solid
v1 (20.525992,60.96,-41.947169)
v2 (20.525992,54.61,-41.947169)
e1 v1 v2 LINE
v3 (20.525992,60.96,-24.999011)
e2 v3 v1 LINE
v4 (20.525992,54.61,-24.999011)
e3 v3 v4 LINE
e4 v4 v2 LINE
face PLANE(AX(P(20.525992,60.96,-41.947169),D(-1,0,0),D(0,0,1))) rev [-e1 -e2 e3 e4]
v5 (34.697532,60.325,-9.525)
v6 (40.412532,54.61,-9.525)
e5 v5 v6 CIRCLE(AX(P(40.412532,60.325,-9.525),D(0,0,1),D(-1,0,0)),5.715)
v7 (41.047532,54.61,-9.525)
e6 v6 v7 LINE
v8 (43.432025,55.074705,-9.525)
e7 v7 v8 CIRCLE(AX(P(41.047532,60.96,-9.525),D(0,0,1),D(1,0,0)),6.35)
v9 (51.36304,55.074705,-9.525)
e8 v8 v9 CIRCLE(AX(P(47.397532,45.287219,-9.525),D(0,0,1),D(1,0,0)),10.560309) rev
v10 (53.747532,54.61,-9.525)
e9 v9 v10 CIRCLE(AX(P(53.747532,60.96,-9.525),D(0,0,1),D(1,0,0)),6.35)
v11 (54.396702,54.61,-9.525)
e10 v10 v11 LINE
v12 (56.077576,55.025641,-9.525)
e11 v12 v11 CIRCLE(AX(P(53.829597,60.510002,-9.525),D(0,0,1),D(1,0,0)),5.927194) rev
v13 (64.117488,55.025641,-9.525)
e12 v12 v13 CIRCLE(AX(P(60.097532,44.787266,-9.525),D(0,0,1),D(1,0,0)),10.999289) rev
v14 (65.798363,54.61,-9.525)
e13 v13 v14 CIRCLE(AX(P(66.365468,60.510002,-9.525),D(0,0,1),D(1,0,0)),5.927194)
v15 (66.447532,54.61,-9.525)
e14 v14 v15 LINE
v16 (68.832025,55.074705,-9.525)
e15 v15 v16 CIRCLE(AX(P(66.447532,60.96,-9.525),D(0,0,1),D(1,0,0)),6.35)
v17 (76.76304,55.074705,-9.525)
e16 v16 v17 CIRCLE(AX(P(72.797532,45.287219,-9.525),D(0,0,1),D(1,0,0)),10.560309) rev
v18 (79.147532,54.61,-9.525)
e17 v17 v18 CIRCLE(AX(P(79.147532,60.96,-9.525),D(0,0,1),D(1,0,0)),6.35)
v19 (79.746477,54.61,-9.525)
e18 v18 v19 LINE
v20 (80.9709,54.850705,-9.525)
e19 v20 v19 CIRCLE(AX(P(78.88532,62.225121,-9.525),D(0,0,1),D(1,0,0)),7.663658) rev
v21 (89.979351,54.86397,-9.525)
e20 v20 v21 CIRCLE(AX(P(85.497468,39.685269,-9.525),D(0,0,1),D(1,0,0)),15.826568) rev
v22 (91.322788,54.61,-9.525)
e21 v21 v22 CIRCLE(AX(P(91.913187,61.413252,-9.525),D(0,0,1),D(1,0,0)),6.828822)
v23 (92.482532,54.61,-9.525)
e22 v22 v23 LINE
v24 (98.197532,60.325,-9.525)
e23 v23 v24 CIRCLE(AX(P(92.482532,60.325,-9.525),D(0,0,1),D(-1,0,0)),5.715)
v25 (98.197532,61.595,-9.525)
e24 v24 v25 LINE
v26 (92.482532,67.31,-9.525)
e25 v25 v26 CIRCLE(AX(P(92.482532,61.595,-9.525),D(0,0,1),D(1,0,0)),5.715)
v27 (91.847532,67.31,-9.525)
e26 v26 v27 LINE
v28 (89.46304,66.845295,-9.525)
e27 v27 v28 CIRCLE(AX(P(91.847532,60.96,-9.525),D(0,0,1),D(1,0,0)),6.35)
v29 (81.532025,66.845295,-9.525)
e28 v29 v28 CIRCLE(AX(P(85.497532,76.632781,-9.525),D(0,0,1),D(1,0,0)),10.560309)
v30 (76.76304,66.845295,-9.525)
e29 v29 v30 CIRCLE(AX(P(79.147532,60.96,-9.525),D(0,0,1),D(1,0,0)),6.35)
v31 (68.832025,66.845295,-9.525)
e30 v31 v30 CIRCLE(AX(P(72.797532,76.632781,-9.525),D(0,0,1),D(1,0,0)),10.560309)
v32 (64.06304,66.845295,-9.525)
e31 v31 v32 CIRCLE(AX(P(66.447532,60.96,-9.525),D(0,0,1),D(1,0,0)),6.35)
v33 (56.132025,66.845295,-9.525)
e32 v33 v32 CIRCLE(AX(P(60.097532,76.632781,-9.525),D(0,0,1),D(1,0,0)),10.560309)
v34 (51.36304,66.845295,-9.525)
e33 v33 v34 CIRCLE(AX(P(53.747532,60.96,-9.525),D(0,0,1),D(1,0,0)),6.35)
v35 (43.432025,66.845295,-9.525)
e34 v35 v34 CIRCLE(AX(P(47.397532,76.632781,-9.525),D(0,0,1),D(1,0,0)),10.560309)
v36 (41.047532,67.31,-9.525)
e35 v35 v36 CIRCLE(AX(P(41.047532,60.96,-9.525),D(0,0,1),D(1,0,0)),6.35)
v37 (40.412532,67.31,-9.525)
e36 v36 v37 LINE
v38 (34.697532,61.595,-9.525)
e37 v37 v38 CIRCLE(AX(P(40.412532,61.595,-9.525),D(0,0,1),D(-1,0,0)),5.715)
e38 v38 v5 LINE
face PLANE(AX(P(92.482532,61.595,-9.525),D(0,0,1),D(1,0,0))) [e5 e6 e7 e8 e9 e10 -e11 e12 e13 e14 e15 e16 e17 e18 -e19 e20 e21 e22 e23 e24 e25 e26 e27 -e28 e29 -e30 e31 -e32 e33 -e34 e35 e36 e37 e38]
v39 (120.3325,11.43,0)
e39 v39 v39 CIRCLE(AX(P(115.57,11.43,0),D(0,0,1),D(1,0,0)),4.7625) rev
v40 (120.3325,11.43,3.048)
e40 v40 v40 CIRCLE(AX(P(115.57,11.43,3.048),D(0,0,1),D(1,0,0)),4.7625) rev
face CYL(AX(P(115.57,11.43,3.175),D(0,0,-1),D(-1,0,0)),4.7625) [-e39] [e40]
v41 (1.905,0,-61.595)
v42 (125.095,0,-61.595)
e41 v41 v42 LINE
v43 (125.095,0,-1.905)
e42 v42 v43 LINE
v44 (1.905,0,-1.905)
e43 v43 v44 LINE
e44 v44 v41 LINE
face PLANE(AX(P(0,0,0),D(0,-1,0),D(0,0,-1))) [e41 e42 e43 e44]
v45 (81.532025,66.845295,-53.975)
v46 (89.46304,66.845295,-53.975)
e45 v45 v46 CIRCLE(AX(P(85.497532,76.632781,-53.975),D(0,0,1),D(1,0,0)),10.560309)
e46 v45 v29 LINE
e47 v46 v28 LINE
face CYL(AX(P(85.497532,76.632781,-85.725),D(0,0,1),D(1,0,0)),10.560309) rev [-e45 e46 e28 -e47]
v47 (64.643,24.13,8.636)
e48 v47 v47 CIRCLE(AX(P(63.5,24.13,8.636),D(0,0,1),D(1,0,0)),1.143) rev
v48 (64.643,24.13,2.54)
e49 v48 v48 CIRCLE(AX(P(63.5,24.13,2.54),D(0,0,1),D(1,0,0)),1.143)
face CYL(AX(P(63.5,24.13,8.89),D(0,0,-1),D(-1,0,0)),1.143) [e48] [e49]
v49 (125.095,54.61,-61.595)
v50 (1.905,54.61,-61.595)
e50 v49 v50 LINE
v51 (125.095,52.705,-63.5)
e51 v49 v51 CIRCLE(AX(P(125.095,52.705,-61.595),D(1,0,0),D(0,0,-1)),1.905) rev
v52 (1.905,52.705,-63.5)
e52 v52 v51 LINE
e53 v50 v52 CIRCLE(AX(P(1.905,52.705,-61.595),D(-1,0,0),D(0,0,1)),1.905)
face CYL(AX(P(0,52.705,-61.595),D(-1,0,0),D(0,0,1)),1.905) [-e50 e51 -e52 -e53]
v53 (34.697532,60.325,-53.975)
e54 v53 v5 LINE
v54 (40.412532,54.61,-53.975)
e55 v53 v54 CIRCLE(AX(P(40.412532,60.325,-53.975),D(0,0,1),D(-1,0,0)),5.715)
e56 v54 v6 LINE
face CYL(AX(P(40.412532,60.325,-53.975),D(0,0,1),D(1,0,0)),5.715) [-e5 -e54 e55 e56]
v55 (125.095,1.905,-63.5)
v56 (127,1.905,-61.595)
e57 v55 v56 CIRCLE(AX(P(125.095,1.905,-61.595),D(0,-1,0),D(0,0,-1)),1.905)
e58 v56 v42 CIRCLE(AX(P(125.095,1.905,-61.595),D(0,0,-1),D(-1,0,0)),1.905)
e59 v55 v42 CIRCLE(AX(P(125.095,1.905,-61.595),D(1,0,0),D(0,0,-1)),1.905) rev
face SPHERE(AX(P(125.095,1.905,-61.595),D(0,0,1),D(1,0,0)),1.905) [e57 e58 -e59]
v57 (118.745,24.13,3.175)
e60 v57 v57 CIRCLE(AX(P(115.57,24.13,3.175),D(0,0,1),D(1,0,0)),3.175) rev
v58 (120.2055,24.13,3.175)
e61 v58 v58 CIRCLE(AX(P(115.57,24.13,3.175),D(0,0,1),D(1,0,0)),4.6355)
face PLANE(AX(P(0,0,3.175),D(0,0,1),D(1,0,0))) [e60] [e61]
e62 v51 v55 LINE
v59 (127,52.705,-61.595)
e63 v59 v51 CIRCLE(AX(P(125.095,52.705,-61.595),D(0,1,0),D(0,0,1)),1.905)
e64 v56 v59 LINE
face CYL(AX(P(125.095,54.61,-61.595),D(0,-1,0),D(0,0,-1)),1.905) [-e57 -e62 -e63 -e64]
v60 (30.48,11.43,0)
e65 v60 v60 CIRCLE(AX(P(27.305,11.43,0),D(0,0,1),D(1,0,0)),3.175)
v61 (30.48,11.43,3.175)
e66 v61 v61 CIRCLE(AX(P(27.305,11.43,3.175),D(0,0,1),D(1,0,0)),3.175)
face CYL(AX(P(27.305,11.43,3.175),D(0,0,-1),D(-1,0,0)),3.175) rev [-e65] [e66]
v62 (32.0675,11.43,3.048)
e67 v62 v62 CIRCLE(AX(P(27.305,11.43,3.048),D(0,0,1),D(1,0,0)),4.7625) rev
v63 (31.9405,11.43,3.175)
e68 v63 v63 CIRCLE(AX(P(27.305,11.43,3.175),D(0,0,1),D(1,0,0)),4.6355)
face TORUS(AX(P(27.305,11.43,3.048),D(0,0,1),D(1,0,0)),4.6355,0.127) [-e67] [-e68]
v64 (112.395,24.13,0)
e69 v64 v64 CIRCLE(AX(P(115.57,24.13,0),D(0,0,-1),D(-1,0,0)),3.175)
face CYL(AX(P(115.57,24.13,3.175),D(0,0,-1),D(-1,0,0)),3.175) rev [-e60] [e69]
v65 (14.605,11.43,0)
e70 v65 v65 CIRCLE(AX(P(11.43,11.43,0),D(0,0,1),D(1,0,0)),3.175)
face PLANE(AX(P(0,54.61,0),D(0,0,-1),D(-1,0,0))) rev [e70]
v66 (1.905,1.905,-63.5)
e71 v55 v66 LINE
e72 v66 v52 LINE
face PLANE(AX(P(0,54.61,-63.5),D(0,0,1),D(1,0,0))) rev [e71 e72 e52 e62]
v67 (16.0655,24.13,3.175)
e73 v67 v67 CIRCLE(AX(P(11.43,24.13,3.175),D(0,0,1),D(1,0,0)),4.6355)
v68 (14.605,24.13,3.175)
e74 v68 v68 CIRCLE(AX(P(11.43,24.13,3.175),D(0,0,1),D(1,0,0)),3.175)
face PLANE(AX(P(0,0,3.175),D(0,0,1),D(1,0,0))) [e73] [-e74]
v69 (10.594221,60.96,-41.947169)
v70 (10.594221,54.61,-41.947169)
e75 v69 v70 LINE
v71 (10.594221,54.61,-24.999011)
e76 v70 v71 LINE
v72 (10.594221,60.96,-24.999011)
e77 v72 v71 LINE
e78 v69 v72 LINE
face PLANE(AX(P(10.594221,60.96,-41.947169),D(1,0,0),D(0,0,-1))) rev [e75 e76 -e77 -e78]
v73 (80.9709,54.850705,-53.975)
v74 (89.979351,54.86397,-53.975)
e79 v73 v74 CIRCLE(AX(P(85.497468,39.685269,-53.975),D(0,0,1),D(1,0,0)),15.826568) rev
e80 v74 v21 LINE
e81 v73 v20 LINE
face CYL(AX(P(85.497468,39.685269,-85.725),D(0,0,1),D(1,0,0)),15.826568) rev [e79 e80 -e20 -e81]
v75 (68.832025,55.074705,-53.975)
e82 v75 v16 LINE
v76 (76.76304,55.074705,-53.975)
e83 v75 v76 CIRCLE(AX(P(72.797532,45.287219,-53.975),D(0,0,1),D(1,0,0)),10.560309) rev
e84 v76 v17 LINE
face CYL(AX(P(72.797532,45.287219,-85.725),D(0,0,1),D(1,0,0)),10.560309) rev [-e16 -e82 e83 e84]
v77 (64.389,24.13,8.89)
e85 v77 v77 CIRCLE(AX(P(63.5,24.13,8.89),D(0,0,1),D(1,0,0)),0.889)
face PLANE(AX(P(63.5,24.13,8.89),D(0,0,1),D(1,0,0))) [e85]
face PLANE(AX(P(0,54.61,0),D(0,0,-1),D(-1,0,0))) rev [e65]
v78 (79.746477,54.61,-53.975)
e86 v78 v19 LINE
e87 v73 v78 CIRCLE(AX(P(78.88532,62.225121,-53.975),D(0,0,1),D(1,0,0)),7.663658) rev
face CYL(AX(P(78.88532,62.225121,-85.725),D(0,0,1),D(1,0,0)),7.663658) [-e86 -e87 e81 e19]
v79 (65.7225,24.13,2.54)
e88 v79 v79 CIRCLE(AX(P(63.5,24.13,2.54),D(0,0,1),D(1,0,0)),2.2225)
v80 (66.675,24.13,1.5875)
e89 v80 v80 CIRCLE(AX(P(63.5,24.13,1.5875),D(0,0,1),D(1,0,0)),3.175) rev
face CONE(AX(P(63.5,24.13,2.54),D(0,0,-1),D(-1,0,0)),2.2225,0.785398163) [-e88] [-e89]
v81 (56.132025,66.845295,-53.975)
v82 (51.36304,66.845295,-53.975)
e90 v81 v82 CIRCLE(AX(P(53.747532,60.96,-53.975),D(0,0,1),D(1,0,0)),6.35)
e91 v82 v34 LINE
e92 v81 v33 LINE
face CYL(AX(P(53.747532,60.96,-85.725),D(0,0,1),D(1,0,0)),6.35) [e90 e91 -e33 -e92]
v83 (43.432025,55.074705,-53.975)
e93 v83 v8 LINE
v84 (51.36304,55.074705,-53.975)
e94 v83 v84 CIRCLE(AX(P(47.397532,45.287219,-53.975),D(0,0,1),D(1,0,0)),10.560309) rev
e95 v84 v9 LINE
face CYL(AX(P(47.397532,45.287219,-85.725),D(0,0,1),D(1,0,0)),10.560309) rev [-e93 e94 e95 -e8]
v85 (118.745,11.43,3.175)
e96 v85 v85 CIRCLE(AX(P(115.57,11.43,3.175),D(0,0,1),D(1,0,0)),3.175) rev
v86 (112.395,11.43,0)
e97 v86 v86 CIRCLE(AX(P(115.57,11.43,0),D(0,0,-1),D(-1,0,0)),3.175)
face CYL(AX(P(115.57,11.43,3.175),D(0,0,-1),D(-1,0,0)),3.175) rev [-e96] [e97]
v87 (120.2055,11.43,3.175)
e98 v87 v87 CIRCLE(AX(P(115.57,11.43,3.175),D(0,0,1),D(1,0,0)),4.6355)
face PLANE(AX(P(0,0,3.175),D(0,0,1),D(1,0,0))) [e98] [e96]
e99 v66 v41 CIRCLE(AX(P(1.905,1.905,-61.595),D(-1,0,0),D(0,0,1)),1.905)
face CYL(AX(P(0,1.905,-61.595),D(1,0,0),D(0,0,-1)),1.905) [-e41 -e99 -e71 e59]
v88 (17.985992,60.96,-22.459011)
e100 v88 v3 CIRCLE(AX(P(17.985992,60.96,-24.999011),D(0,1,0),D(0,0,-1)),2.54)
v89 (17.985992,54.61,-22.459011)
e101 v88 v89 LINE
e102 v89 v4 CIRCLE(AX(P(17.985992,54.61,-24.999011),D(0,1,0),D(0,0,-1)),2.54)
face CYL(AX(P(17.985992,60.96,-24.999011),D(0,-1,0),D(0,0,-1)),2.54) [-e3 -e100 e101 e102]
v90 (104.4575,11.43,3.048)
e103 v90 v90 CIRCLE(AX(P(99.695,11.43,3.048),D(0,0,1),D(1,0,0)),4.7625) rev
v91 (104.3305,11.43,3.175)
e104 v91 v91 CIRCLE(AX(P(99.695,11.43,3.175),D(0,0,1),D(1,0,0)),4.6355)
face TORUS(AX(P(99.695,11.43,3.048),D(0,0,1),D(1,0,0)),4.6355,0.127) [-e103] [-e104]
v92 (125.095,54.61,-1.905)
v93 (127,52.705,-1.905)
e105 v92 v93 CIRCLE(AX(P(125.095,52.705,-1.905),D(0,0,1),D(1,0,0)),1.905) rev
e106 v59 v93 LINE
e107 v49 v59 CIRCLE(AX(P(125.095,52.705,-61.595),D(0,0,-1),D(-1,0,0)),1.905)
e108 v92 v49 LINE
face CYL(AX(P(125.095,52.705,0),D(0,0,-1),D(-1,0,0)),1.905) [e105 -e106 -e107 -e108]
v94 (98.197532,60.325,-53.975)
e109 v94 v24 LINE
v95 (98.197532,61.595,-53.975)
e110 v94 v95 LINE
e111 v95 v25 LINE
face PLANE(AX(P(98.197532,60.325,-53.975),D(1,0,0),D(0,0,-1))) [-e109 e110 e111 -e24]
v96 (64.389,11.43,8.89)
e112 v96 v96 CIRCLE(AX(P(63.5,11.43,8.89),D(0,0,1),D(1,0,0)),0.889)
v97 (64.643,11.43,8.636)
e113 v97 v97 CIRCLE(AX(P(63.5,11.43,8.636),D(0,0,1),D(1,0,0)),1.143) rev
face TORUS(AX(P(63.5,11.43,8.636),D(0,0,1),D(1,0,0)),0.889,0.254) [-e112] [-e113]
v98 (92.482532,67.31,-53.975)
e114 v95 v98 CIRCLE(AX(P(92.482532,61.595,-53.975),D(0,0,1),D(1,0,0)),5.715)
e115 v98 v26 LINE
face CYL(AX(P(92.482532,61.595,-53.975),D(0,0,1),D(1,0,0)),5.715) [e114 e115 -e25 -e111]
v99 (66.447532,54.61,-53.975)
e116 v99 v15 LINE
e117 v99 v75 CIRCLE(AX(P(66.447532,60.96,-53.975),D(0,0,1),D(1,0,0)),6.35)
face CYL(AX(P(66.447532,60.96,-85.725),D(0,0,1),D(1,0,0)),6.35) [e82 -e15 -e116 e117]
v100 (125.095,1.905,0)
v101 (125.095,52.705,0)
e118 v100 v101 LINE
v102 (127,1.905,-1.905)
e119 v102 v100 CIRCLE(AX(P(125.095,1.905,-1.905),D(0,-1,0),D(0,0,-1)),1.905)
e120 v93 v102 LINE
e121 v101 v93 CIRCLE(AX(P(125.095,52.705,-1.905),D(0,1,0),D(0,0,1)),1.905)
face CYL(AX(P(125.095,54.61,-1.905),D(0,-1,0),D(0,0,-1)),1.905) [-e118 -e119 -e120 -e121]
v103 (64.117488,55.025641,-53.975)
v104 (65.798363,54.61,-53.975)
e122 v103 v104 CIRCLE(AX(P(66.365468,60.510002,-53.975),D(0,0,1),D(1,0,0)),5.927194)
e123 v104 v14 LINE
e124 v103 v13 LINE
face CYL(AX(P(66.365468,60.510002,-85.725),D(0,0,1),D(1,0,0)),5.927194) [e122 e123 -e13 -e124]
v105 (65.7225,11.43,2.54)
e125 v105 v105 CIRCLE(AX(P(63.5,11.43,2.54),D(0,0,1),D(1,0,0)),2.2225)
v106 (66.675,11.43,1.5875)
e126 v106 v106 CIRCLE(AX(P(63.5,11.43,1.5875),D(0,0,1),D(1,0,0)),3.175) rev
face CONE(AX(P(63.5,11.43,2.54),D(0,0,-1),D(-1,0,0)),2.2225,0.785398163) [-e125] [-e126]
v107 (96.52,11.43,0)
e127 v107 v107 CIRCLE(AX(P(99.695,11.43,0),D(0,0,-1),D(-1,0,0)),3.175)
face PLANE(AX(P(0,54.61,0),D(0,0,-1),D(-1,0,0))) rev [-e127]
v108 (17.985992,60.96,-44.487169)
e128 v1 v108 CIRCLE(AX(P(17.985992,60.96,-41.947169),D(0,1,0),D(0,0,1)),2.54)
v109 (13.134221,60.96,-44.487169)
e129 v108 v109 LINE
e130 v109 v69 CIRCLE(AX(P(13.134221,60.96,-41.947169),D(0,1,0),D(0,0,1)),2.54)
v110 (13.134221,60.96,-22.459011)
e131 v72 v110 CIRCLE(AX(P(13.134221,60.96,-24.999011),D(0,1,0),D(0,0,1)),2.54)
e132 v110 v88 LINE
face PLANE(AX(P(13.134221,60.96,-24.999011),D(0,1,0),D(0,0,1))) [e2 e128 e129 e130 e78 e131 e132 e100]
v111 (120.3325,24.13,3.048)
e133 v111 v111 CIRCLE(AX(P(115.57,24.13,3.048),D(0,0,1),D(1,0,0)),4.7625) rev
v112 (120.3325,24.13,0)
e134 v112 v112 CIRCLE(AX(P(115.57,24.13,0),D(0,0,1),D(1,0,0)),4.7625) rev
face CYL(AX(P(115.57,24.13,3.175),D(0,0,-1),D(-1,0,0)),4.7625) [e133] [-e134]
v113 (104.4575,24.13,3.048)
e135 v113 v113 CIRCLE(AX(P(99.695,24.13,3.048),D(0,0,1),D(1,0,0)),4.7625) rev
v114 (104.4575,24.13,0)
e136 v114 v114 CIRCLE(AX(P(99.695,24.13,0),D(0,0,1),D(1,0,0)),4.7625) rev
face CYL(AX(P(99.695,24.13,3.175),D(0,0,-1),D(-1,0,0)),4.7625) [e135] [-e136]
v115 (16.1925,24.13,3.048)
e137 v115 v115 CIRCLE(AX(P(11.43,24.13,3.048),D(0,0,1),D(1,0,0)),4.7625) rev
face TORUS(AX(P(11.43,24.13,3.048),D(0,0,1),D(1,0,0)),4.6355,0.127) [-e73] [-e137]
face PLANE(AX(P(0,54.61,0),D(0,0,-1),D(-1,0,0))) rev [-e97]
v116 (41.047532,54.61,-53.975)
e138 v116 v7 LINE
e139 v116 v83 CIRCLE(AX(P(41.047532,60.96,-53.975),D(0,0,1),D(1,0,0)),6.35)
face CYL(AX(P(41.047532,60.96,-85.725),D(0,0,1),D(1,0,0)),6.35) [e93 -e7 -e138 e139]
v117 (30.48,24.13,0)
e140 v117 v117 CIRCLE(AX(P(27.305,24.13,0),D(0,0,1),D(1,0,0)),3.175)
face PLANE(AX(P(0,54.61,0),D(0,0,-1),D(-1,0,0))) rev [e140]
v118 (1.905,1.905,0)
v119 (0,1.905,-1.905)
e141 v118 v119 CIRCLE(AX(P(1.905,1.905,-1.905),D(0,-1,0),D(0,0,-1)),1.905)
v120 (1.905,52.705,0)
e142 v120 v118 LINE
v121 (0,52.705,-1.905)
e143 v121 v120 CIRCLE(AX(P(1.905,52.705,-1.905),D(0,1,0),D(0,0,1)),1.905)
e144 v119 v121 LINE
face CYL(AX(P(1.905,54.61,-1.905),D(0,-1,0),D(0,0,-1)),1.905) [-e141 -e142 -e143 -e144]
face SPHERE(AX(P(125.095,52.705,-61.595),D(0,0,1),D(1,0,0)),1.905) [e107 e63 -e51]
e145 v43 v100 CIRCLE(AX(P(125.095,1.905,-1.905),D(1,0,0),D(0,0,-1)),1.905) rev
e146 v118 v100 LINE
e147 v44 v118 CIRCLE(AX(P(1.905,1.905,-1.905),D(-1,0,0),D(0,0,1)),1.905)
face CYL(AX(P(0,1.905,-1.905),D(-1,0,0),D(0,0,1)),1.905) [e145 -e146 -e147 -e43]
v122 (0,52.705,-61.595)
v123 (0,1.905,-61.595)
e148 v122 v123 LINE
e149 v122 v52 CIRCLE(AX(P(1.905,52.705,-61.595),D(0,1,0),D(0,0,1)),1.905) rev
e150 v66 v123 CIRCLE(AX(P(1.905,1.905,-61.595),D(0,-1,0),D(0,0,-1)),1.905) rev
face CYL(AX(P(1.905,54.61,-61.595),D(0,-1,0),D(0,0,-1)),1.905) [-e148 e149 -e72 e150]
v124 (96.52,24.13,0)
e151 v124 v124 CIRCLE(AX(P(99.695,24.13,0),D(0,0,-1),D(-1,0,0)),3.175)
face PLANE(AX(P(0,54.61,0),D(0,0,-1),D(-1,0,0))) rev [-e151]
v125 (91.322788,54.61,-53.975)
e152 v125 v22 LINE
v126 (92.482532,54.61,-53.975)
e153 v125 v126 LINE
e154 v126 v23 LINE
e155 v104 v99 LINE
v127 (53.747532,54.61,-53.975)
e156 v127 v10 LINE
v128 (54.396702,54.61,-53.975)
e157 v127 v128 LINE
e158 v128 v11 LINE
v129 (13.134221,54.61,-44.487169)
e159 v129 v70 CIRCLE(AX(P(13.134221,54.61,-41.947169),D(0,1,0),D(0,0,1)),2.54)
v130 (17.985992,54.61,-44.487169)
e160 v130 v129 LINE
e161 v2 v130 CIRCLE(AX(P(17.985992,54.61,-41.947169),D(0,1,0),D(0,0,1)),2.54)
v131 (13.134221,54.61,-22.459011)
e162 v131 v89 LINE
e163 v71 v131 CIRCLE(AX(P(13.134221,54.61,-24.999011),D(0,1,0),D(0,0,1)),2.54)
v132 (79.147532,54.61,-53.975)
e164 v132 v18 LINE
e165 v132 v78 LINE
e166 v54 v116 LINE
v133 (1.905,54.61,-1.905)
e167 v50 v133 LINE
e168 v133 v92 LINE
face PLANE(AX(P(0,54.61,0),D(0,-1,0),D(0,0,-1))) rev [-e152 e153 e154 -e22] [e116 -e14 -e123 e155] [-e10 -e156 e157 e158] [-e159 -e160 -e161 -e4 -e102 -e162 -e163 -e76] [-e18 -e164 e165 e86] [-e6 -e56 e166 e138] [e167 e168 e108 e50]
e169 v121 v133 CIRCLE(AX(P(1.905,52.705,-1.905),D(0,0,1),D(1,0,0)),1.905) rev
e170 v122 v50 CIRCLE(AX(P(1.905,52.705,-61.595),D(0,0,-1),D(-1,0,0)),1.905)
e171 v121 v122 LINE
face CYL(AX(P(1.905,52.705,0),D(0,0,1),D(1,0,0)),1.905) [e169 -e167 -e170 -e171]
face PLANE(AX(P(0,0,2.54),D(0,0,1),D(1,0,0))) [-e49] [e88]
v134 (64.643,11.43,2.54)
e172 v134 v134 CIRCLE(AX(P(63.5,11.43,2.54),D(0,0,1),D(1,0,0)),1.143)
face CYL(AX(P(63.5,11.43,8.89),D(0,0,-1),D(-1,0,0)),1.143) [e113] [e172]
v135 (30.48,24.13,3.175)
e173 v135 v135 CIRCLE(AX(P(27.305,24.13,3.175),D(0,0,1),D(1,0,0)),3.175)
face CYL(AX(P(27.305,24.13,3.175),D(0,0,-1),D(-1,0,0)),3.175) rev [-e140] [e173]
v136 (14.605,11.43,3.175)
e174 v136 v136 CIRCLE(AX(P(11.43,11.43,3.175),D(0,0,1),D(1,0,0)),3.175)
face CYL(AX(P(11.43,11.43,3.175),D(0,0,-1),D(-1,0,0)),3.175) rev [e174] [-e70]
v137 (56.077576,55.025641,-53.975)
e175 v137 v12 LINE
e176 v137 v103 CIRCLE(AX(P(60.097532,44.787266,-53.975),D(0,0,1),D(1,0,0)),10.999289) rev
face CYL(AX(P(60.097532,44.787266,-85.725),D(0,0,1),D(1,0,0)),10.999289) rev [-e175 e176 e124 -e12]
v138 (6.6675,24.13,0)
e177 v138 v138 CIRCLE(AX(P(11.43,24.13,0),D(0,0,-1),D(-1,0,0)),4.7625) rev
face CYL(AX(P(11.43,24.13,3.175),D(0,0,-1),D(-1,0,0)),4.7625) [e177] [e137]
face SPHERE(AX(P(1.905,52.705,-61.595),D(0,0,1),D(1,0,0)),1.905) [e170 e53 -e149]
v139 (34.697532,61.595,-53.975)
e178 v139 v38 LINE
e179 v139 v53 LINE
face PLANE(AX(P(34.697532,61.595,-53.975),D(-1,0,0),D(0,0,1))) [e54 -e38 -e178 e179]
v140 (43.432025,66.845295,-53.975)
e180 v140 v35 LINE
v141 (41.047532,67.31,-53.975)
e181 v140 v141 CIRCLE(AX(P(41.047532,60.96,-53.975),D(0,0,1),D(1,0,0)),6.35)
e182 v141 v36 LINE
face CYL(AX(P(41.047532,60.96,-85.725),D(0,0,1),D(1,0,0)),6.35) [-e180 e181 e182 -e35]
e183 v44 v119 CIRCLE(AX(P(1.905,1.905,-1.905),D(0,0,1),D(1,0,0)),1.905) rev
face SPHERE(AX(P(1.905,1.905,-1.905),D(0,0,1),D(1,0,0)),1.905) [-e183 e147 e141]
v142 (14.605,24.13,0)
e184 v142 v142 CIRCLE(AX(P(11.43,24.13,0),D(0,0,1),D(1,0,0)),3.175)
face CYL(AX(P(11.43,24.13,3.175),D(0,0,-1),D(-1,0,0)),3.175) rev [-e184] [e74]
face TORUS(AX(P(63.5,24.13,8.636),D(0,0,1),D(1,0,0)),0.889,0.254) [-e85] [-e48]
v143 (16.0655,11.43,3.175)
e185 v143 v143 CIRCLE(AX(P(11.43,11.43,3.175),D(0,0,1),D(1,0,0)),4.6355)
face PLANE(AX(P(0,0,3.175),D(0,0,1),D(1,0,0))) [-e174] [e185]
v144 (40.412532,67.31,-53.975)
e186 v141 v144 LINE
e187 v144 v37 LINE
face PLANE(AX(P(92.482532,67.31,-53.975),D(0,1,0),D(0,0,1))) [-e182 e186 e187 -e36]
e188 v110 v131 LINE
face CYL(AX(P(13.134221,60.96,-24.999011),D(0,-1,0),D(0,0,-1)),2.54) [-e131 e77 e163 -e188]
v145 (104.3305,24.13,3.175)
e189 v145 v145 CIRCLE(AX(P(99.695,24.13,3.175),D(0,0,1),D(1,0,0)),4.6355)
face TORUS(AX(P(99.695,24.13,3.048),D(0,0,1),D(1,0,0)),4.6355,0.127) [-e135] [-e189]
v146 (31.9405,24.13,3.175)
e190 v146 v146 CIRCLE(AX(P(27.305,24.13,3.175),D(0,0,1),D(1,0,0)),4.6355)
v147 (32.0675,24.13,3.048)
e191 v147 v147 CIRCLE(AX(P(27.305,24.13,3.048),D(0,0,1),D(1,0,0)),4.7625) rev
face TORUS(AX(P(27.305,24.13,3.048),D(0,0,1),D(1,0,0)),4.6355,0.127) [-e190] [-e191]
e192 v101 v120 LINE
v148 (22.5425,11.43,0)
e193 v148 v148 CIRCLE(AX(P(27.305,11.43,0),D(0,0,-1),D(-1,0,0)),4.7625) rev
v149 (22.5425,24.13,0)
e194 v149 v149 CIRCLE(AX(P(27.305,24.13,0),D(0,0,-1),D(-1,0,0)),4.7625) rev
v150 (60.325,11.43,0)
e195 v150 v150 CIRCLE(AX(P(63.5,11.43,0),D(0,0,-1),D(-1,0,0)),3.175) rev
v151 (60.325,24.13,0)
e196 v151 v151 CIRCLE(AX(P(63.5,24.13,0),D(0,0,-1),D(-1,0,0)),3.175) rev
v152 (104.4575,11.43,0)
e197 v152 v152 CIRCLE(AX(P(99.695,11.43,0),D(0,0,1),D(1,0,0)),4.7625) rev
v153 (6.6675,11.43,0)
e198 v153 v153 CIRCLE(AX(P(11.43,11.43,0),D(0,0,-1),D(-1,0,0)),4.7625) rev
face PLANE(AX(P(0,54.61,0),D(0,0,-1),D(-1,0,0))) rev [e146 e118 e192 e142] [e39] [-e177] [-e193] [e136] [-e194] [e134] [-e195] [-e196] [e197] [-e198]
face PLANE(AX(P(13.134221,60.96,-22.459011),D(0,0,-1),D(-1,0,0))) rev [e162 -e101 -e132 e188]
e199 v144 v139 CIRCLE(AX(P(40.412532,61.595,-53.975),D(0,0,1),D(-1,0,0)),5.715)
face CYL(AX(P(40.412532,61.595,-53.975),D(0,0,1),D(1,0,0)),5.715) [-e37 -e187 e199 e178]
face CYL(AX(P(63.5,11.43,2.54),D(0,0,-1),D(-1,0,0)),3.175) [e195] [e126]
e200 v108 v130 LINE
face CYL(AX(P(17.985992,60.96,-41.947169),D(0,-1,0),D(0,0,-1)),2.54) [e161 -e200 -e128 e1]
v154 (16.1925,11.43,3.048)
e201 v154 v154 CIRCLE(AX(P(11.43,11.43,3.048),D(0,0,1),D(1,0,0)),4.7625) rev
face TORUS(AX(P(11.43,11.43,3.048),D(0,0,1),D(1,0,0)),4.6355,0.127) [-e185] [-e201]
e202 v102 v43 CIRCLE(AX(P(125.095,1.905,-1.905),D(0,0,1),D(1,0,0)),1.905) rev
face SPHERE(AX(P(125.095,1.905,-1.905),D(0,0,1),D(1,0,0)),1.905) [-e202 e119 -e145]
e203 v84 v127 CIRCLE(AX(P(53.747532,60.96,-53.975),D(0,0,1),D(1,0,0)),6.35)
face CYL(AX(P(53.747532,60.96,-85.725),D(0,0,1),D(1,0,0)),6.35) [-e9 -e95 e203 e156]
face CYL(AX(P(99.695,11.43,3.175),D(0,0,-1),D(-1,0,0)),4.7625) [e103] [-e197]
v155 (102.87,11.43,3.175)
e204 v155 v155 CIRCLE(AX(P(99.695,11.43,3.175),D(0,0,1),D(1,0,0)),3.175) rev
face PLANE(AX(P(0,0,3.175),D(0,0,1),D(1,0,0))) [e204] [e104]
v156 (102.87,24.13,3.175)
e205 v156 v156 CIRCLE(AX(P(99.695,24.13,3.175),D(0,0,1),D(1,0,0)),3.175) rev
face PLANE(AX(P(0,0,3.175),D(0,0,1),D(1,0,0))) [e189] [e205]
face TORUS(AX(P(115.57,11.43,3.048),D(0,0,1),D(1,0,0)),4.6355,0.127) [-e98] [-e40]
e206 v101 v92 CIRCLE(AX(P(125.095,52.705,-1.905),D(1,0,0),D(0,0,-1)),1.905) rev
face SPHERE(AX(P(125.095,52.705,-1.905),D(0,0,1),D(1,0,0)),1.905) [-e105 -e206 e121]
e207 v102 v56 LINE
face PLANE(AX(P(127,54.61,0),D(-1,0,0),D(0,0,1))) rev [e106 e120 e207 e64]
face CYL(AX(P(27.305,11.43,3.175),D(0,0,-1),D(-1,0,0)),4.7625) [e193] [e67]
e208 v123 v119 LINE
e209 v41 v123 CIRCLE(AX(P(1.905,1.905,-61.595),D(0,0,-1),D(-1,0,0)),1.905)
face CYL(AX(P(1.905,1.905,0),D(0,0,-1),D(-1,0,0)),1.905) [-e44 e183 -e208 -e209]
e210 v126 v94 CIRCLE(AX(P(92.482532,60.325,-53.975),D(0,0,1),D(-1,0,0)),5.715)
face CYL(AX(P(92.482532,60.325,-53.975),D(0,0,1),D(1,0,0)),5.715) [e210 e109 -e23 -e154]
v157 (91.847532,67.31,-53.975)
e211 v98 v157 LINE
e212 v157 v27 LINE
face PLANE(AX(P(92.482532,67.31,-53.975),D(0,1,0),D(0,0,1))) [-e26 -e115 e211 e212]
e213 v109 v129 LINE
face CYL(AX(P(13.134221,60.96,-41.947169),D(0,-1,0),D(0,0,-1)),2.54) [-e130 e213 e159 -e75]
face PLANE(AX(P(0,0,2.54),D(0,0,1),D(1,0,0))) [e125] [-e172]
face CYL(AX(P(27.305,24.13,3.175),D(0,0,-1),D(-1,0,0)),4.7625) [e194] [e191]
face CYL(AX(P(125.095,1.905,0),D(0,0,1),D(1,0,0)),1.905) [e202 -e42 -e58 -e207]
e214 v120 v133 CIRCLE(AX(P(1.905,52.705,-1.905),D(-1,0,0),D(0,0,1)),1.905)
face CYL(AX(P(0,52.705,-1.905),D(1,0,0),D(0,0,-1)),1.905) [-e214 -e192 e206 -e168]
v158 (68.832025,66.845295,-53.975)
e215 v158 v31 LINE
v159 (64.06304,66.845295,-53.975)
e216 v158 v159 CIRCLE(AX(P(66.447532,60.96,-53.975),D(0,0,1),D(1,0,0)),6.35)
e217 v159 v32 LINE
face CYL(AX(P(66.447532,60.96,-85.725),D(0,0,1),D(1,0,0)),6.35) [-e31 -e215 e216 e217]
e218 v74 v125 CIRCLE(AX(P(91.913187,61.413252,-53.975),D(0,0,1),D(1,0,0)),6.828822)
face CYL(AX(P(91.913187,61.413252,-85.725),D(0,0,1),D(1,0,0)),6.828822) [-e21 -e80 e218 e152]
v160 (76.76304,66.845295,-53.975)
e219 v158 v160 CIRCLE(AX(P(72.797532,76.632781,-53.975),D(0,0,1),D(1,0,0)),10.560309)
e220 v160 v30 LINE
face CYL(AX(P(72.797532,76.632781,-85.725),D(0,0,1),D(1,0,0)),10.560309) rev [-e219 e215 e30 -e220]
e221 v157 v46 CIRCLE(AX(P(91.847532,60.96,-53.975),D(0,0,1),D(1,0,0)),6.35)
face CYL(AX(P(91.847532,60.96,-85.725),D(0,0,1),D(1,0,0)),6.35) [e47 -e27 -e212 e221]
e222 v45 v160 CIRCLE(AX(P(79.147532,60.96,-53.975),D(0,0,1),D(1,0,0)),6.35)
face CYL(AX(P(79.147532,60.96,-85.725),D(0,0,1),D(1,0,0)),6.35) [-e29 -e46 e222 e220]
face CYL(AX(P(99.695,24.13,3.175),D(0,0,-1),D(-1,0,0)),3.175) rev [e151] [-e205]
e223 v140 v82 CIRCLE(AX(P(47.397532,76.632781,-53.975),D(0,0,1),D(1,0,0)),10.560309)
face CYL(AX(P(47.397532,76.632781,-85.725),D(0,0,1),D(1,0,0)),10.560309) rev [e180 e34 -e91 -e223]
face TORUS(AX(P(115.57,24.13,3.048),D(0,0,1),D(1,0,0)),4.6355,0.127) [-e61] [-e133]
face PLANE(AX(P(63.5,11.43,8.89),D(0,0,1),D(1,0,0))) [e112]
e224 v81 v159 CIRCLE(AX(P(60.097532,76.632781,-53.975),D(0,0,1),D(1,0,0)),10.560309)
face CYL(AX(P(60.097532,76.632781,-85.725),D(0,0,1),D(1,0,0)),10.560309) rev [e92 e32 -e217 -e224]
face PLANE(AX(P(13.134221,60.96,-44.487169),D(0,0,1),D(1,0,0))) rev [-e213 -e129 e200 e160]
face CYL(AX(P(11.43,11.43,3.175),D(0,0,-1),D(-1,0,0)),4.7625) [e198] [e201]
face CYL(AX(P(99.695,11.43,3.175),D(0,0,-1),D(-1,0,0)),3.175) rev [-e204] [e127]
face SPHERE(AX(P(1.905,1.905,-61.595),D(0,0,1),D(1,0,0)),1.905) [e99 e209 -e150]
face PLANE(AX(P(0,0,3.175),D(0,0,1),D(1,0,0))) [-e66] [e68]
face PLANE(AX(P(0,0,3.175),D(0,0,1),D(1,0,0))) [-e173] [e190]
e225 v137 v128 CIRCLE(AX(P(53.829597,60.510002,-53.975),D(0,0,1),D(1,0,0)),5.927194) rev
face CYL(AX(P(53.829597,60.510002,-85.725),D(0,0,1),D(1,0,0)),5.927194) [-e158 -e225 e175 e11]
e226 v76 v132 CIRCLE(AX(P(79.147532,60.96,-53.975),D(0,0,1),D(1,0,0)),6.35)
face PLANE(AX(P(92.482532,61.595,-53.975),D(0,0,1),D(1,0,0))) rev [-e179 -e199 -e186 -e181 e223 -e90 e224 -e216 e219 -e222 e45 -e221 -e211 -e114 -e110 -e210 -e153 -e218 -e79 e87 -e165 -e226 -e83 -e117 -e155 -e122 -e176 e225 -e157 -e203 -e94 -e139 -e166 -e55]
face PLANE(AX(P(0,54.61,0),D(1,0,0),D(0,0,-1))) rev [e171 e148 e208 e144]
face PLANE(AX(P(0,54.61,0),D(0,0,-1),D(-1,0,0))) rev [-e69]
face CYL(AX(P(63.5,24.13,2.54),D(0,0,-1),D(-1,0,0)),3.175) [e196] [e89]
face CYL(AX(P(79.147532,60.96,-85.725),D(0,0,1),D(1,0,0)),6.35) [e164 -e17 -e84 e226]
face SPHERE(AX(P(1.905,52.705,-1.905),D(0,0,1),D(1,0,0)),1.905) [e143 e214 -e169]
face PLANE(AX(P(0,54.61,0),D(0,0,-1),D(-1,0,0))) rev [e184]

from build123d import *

# Parameters (mm, degrees)
SKETCH2_W           = 127
SKETCH2_H           = 63.5
BOSS_EXTRUDE1_DEPTH = 54.61
FILLET1_R           = 1.905
SKETCH3_R           = 4.7625
SKETCH3_R_2         = 3.175
BOSS_EXTRUDE2_DEPTH = 3.175
FILLET2_R           = 0.127
BOSS_EXTRUDE3_DEPTH = 53.975
CUT_EXTRUDE1_DEPTH  = 9.525
BOSS_EXTRUDE4_DEPTH = 6.35
BOSS_EXTRUDE5_DEPTH = 2.54
SKETCH8_R           = 1.143
BOSS_EXTRUDE6_DEPTH = 6.35
FILLET3_R           = 0.254
CUT_EXTRUDE10_DEPTH = 76.2
CUT_EXTRUDE12_DEPTH = 76.2
CUT_EXTRUDE14_DEPTH = 76.2
CUT_EXTRUDE18_DEPTH = 76.2
CUT_EXTRUDE19_DEPTH = 76.2


with BuildPart() as part:
    # Sketch2 → Boss-Extrude1 (new body)
    with BuildSketch(Plane(origin=(0, 0, 0), x_dir=(1, 0, 0), z_dir=(0, 1, 0))):
        with Locations((63.5, 31.75)):
            Rectangle(SKETCH2_W, SKETCH2_H)
    extrude(amount=BOSS_EXTRUDE1_DEPTH)

    # Fillet1
    fillet1_edges = [part.edges().sort_by_distance(p)[0] for p in [
        (127, 54.61, -31.75),
        (63.5, 54.61, -63.5),
        (0, 54.61, -31.75),
        (63.5, 0, -63.5),
        (127, 0, -31.75),
        (63.5, 0, 0),
        (0, 0, -31.75),
        (63.5, 54.61, 0),
        (0, 27.305, -63.5),
        (127, 27.305, -63.5),
        (127, 27.305, 0),
        (0, 27.305, 0),
    ]]
    fillet(fillet1_edges, radius=FILLET1_R)

    # Sketch3 → Boss-Extrude2 (add)
    # profile 1 of 8: a face of its own
    with BuildSketch(Plane.XY):
        with Locations(Location((11.43, 24.13, 0), (0, 0, 180))):
            Circle(SKETCH3_R)
        with Locations((11.43, 24.13)):
            Circle(SKETCH3_R_2, mode=Mode.SUBTRACT)
    # profile 2 of 8: a face of its own
    with BuildSketch(Plane.XY):
        with Locations(Location((27.305, 24.13, 0), (0, 0, 180))):
            Circle(SKETCH3_R)
        with Locations((27.305, 24.13)):
            Circle(SKETCH3_R_2, mode=Mode.SUBTRACT)
    # profile 3 of 8: a face of its own
    with BuildSketch(Plane.XY):
        with Locations(Location((27.305, 11.43, 0), (0, 0, 180))):
            Circle(SKETCH3_R)
        with Locations((27.305, 11.43)):
            Circle(SKETCH3_R_2, mode=Mode.SUBTRACT)
    # profile 4 of 8: a face of its own
    with BuildSketch(Plane.XY):
        with Locations(Location((11.43, 11.43, 0), (0, 0, 180))):
            Circle(SKETCH3_R)
        with Locations((11.43, 11.43)):
            Circle(SKETCH3_R_2, mode=Mode.SUBTRACT)
    # profile 5 of 8: a face of its own
    with BuildSketch(Plane.XY):
        with Locations((99.695, 11.43)):
            Circle(SKETCH3_R)
        with Locations(Location((99.695, 11.43, 0), (0, 0, 180))):
            Circle(SKETCH3_R_2, mode=Mode.SUBTRACT)
    # profile 6 of 8: a face of its own
    with BuildSketch(Plane.XY):
        with Locations((99.695, 24.13)):
            Circle(SKETCH3_R)
        with Locations(Location((99.695, 24.13, 0), (0, 0, 180))):
            Circle(SKETCH3_R_2, mode=Mode.SUBTRACT)
    # profile 7 of 8: a face of its own
    with BuildSketch(Plane.XY):
        with Locations((115.57, 24.13)):
            Circle(SKETCH3_R)
        with Locations(Location((115.57, 24.13, 0), (0, 0, 180))):
            Circle(SKETCH3_R_2, mode=Mode.SUBTRACT)
    # profile 8 of 8: a face of its own
    with BuildSketch(Plane.XY):
        with Locations((115.57, 11.43)):
            Circle(SKETCH3_R)
        with Locations(Location((115.57, 11.43, 0), (0, 0, 180))):
            Circle(SKETCH3_R_2, mode=Mode.SUBTRACT)
    extrude(amount=BOSS_EXTRUDE2_DEPTH)

    # Fillet2
    fillet2_edges = [part.edges().sort_by_distance(p)[0] for p in [
        (16.1925, 24.13, 3.175),
        (32.0675, 24.13, 3.175),
        (32.0675, 11.43, 3.175),
        (16.1925, 11.43, 3.175),
        (94.9325, 11.43, 3.175),
        (94.9325, 24.13, 3.175),
        (110.8075, 24.13, 3.175),
        (110.8075, 11.43, 3.175),
    ]]
    fillet(fillet2_edges, radius=FILLET2_R)

    # Sketch5 → Boss-Extrude3 (add)
    with BuildSketch(Plane.XY):
        with BuildLine():
            Line((92.482532425, 54.61), (40.412532425, 54.61))
            ThreePointArc((40.412532425, 54.61), (36.371417171, 56.283884746), (34.697532425, 60.325))
            Line((34.697532425, 60.325), (34.697532425, 61.595))
            ThreePointArc((34.697532425, 61.595), (36.371417171, 65.636115254), (40.412532425, 67.31))
            Line((40.412532425, 67.31), (92.482532425, 67.31))
            ThreePointArc((92.482532425, 67.31), (96.52364768, 65.636115254), (98.197532425, 61.595))
            Line((98.197532425, 61.595), (98.197532425, 60.325))
            ThreePointArc((98.197532425, 60.325), (96.52364768, 56.283884746), (92.482532425, 54.61))
        make_face()
    extrude(amount=-BOSS_EXTRUDE3_DEPTH)

    # Sketch5<3> → Cut-Extrude1 (cut)
    with BuildSketch(Plane.XY):
        with BuildLine():
            Line((92.482532425, 54.61), (40.412532425, 54.61))
            ThreePointArc((40.412532425, 54.61), (36.371417171, 56.283884746), (34.697532425, 60.325))
            Line((34.697532425, 60.325), (34.697532425, 61.595))
            ThreePointArc((34.697532425, 61.595), (36.371417171, 65.636115254), (40.412532425, 67.31))
            Line((40.412532425, 67.31), (92.482532425, 67.31))
            ThreePointArc((92.482532425, 67.31), (96.52364768, 65.636115254), (98.197532425, 61.595))
            Line((98.197532425, 61.595), (98.197532425, 60.325))
            ThreePointArc((98.197532425, 60.325), (96.52364768, 56.283884746), (92.482532425, 54.61))
        make_face()
    extrude(amount=-CUT_EXTRUDE1_DEPTH, mode=Mode.SUBTRACT)

    # Sketch6 → Boss-Extrude4 (add)
    with BuildSketch(Plane(origin=(0, 54.61, 0), x_dir=(1, 0, 0), z_dir=(0, 1, 0))):
        with BuildLine():
            Line((13.134221201, 44.48716935), (17.985991951, 44.48716935))
            ThreePointArc((17.985991951, 44.48716935), (19.782043175, 43.743220574), (20.525991951, 41.94716935))
            Line((20.525991951, 41.94716935), (20.525991951, 24.99901115))
            ThreePointArc((20.525991951, 24.99901115), (19.782043175, 23.202959925), (17.985991951, 22.45901115))
            Line((17.985991951, 22.45901115), (13.134221201, 22.45901115))
            ThreePointArc((13.134221201, 22.45901115), (11.338169977, 23.202959925), (10.594221201, 24.99901115))
            Line((10.594221201, 24.99901115), (10.594221201, 41.94716935))
            ThreePointArc((10.594221201, 41.94716935), (11.338169977, 43.743220574), (13.134221201, 44.48716935))
        make_face()
    extrude(amount=BOSS_EXTRUDE4_DEPTH)

    # Sketch7 → Boss-Extrude5 (add)
    with BuildSketch(Plane.XY):
        with BuildLine():
            ThreePointArc((66.675, 24.13), (63.5, 27.305), (60.325, 24.13))
            Line((60.325, 24.13), (66.675, 24.13))
        make_face()
        with BuildLine():
            Line((66.675, 24.13), (60.325, 24.13))
            ThreePointArc((60.325, 24.13), (63.5, 20.955), (66.675, 24.13))
        make_face()
        with BuildLine():
            ThreePointArc((66.675, 11.43), (63.5, 14.605), (60.325, 11.43))
            Line((60.325, 11.43), (66.675, 11.43))
        make_face()
        with BuildLine():
            Line((66.675, 11.43), (60.325, 11.43))
            ThreePointArc((60.325, 11.43), (63.5, 8.255), (66.675, 11.43))
        make_face()
    extrude(amount=BOSS_EXTRUDE5_DEPTH)

    # Chamfer2: read off the stored shape, not the designer's step
    # Chamfer2 outline → Chamfer2 (revolve, cut)
    with BuildSketch(Plane(origin=(63.5, 11.43, 0), x_dir=(1, 0, 0), z_dir=(0, -1, 0))):
        Polygon((3.175, 2.54), (2.2225, 2.54), (3.175, 1.5875), align=None)
    revolve(axis=Axis((63.5, 11.43, 0), (0, 0, 1)), mode=Mode.SUBTRACT)

    # Chamfer2 2 outline → Chamfer2 2 (revolve, cut)
    with BuildSketch(Plane(origin=(63.5, 24.13, 0), x_dir=(1, 0, 0), z_dir=(0, -1, 0))):
        Polygon((3.175, 2.54), (2.2225, 2.54), (3.175, 1.5875), align=None)
    revolve(axis=Axis((63.5, 24.13, 0), (0, 0, 1)), mode=Mode.SUBTRACT)

    # Sketch8 → Boss-Extrude6 (add)
    with BuildSketch(Plane.XY.offset(2.54)):
        with Locations((63.5, 24.13)):
            Circle(SKETCH8_R)
        with Locations((63.5, 11.43)):
            Circle(SKETCH8_R)
    extrude(amount=BOSS_EXTRUDE6_DEPTH)

    # Fillet3
    fillet3_edges = [part.edges().sort_by_distance(p)[0] for p in [
        (62.357, 24.13, 8.89),
        (62.357, 11.43, 8.89),
    ]]
    fillet(fillet3_edges, radius=FILLET3_R)

    # Sketch10 → Cut-Extrude10 (cut)
    with BuildSketch(Plane.XY.offset(-9.525)):
        with BuildLine():
            ThreePointArc((41.047532425, 67.31), (42.262208691, 67.192741096), (43.432024608, 66.845294982))
            ThreePointArc((43.432024608, 66.845294982), (47.397532425, 66.072471572), (51.363040242, 66.845294982))
            ThreePointArc((51.363040242, 66.845294982), (52.532856159, 67.192741096), (53.747532425, 67.31))
            Line((53.747532425, 67.31), (41.047532425, 67.31))
        make_face()
        with BuildLine():
            Line((66.447532425, 67.31), (53.747532425, 67.31))
            ThreePointArc((53.747532425, 67.31), (54.962208691, 67.192741096), (56.132024608, 66.845294982))
            ThreePointArc((56.132024608, 66.845294982), (60.097532425, 66.072471572), (64.063040242, 66.845294982))
            ThreePointArc((64.063040242, 66.845294982), (65.232856159, 67.192741096), (66.447532425, 67.31))
        make_face()
        with BuildLine():
            Line((79.147532425, 67.31), (66.447532425, 67.31))
            ThreePointArc((66.447532425, 67.31), (67.662208691, 67.192741096), (68.832024608, 66.845294982))
            ThreePointArc((68.832024608, 66.845294982), (72.797532425, 66.072471572), (76.763040242, 66.845294982))
            ThreePointArc((76.763040242, 66.845294982), (77.932856159, 67.192741096), (79.147532425, 67.31))
        make_face()
        with BuildLine():
            Line((91.847532425, 67.31), (79.147532425, 67.31))
            ThreePointArc((79.147532425, 67.31), (80.362208691, 67.192741096), (81.532024608, 66.845294982))
            ThreePointArc((81.532024608, 66.845294982), (85.497532425, 66.072471572), (89.463040242, 66.845294982))
            ThreePointArc((89.463040242, 66.845294982), (90.632856159, 67.192741096), (91.847532425, 67.31))
        make_face()
    extrude(amount=-CUT_EXTRUDE10_DEPTH, mode=Mode.SUBTRACT)

    # Sketch10<4> → Cut-Extrude12 (cut)
    with BuildSketch(Plane.XY.offset(-9.525)):
        with BuildLine():
            ThreePointArc((51.363040242, 55.074705018), (47.397532425, 55.847528428), (43.432024608, 55.074705018))
            ThreePointArc((43.432024608, 55.074705018), (42.262208691, 54.727258904), (41.047532425, 54.61))
            Line((41.047532425, 54.61), (53.747532425, 54.61))
            ThreePointArc((53.747532425, 54.61), (52.532856159, 54.727258904), (51.363040242, 55.074705018))
        make_face()
    extrude(amount=-CUT_EXTRUDE12_DEPTH, mode=Mode.SUBTRACT)

    # Sketch10<5> → Cut-Extrude14 (cut)
    with BuildSketch(Plane.XY.offset(-9.525)):
        with BuildLine():
            ThreePointArc((68.832024608, 55.074705018), (67.662208691, 54.727258904), (66.447532425, 54.61))
            Line((66.447532425, 54.61), (79.147532425, 54.61))
            ThreePointArc((79.147532425, 54.61), (77.932856159, 54.727258904), (76.763040242, 55.074705018))
            ThreePointArc((76.763040242, 55.074705018), (72.797532425, 55.847528428), (68.832024608, 55.074705018))
        make_face()
    extrude(amount=-CUT_EXTRUDE14_DEPTH, mode=Mode.SUBTRACT)

    # Sketch10<8> → Cut-Extrude18 (cut)
    with BuildSketch(Plane.XY.offset(-9.525)):
        with BuildLine():
            ThreePointArc((56.077576374, 55.025640696), (55.252398566, 54.756110566), (54.396702002, 54.61))
            Line((54.396702002, 54.61), (65.798362848, 54.61))
            ThreePointArc((65.798362848, 54.61), (64.942666285, 54.756110566), (64.117488476, 55.025640696))
            ThreePointArc((64.117488476, 55.025640696), (62.143200868, 55.59465252), (60.097532425, 55.78655519))
            ThreePointArc((60.097532425, 55.78655519), (58.051863982, 55.59465252), (56.077576374, 55.025640696))
        make_face()
    extrude(amount=-CUT_EXTRUDE18_DEPTH, mode=Mode.SUBTRACT)

    # Sketch10<9> → Cut-Extrude19 (cut)
    with BuildSketch(Plane.XY.offset(-9.525)):
        with BuildLine():
            ThreePointArc((80.970900431, 54.850704822), (80.363595888, 54.70538965), (79.746476677, 54.61))
            Line((79.746476677, 54.61), (91.32278758, 54.61))
            ThreePointArc((91.32278758, 54.61), (90.64469738, 54.703278586), (89.979351354, 54.863970463))
            ThreePointArc((89.979351354, 54.863970463), (87.750167601, 55.350695943), (85.474162117, 55.511819916))
            ThreePointArc((85.474162117, 55.511819916), (83.198641037, 55.343993468), (80.970900431, 54.850704822))
        make_face()
    extrude(amount=-CUT_EXTRUDE19_DEPTH, mode=Mode.SUBTRACT)


solid = part.part
